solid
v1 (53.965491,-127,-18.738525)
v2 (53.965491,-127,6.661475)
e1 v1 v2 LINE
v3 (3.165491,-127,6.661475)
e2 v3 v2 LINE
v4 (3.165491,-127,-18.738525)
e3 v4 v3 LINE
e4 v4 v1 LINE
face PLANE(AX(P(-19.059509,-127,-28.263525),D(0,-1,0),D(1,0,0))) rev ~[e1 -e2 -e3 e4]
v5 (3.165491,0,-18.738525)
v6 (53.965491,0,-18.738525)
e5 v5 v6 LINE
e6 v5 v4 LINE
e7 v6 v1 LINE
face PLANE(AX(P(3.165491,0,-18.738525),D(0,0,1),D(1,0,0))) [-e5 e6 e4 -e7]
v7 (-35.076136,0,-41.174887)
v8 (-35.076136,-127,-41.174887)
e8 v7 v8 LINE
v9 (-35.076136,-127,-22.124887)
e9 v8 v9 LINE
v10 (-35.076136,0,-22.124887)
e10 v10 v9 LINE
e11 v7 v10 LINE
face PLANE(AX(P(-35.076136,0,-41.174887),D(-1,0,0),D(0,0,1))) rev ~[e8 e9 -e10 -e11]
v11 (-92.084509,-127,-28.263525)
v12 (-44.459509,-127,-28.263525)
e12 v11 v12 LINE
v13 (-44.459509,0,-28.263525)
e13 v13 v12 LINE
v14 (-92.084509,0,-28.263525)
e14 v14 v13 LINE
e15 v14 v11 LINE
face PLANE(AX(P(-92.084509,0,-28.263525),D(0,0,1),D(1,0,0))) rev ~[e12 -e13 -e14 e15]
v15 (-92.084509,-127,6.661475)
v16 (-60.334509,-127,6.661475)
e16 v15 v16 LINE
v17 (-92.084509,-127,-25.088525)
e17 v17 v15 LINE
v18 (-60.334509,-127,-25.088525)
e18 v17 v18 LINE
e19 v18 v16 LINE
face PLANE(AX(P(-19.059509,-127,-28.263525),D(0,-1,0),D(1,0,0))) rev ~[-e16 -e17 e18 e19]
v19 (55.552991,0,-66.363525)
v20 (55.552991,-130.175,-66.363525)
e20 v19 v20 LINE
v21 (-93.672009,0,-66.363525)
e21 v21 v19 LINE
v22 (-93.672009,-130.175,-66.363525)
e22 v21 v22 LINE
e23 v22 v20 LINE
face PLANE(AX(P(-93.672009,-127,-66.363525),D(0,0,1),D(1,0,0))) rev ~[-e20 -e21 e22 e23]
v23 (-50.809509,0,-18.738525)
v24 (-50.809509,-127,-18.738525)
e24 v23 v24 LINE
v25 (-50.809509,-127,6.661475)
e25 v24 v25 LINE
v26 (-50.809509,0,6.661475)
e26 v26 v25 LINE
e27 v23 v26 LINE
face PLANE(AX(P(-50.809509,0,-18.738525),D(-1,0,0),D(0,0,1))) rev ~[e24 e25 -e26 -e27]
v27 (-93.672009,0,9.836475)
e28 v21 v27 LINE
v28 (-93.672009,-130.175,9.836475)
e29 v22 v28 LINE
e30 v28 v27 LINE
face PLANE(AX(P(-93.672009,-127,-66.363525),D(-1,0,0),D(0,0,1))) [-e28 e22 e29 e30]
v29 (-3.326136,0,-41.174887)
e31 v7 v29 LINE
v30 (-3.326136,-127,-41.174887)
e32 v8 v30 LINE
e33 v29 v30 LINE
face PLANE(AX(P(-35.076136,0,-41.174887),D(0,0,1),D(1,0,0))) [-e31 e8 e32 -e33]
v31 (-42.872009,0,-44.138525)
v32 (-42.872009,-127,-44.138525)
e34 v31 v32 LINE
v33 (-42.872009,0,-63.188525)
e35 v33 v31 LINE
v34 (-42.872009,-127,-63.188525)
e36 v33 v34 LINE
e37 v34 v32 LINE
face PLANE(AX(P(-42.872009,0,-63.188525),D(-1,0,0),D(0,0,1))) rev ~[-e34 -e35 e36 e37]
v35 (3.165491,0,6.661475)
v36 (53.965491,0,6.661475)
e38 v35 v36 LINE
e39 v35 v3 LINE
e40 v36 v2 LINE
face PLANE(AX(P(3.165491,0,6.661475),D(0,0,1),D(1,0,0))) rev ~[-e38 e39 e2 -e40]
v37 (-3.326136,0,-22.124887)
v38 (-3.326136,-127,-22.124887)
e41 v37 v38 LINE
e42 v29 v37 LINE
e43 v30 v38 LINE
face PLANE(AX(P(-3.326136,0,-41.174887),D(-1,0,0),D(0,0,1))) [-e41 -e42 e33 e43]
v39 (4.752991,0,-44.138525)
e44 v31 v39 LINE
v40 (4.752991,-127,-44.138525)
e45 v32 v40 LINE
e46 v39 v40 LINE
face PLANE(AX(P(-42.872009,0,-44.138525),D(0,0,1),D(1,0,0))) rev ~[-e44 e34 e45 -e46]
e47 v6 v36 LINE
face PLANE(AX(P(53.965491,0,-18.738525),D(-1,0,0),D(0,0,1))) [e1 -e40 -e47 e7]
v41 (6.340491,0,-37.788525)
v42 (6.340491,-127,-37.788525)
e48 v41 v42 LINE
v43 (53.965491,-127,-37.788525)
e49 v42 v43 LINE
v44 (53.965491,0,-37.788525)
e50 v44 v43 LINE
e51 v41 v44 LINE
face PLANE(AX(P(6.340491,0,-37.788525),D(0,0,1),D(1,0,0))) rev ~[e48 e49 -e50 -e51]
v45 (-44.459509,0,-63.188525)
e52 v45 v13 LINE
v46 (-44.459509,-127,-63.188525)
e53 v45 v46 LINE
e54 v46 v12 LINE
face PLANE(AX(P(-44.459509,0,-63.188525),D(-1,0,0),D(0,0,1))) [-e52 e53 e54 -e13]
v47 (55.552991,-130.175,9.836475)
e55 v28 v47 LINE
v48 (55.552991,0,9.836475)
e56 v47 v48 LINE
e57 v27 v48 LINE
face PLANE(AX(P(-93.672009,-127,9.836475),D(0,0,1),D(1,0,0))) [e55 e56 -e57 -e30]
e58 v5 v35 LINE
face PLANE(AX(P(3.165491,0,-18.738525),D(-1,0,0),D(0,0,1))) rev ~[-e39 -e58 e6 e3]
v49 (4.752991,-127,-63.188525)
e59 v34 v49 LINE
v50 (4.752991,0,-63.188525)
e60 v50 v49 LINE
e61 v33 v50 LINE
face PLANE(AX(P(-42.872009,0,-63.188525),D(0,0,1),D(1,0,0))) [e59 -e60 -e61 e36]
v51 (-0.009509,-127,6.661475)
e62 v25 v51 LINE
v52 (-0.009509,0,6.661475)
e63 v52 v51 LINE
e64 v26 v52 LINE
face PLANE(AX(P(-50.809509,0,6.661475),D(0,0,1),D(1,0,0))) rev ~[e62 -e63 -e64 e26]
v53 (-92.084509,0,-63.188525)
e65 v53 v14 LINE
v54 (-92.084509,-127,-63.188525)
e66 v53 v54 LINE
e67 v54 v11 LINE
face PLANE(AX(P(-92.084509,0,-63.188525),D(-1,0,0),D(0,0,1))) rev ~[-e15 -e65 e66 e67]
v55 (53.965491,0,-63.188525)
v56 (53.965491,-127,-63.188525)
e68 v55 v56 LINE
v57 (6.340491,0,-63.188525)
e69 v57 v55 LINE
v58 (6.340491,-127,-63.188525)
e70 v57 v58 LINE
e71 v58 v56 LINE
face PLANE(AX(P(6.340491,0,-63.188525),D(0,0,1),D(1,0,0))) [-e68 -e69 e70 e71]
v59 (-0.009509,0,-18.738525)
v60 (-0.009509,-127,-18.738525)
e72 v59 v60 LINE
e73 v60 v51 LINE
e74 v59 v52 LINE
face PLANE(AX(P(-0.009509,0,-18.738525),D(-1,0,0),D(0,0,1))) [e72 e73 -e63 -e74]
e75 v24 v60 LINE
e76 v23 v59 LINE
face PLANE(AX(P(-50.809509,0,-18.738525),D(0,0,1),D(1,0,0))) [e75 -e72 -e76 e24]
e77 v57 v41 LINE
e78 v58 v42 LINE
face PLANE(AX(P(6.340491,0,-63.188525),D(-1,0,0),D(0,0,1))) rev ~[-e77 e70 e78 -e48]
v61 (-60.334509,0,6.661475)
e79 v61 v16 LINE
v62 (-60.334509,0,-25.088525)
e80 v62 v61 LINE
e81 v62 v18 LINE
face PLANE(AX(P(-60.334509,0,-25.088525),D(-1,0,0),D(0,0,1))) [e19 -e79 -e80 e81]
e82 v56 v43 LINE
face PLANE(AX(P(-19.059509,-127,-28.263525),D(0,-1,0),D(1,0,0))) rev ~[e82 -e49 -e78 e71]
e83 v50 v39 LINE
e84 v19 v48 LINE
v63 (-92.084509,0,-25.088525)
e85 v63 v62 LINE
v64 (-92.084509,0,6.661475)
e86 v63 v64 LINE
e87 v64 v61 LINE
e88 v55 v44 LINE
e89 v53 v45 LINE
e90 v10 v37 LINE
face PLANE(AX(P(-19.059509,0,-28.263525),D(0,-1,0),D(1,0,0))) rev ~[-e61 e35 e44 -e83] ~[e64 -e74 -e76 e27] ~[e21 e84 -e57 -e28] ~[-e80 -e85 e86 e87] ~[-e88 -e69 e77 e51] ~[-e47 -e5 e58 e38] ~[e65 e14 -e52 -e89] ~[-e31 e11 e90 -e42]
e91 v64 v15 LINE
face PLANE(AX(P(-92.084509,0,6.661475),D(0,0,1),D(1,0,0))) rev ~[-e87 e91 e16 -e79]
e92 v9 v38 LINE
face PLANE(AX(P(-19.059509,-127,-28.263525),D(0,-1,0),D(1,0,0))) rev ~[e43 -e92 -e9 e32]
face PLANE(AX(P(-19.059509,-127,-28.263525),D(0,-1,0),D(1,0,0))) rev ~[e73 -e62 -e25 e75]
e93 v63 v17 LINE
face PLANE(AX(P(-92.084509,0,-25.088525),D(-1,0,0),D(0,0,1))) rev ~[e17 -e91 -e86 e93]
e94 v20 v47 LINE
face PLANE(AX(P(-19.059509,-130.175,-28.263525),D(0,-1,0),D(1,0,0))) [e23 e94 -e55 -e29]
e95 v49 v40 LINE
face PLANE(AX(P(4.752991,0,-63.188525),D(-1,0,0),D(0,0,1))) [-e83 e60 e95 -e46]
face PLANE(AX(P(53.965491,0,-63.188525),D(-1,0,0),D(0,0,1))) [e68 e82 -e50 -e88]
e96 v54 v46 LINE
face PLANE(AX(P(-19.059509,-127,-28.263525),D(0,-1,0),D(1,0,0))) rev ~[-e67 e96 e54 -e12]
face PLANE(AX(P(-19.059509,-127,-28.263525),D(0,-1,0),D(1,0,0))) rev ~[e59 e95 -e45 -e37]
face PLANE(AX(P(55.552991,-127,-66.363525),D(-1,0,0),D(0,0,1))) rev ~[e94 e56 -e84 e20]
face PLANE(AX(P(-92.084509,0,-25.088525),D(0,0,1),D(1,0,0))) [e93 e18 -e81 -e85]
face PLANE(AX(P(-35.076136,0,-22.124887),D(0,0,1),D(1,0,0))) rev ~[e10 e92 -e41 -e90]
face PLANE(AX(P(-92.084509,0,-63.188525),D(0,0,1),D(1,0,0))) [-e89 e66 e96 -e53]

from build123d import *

# Parameters (mm, degrees)
F0_W     = 149.225
F0_H     = 76.2
F0_W_2   = 47.625
F0_H_2   = 34.925
F0_W_3   = 31.75
F0_H_3   = 19.05
F0_H_4   = 25.4
F0_H_5   = 31.75
F0_W_4   = 50.8
F1_DEPTH = 127
F2_W     = 149.225
F2_H     = 76.2
F3_DEPTH = 3.175


# Not quite as in the source:
# - a length typed as a fraction of an inch, garbled in the dataset ("3 / 203.2 mm" for 3/8 in), is restored


with BuildPart() as f1:
    # F0 (on Front) → F1 (new body)
    with BuildSketch(Plane.XZ):
        with Locations((-19.0595093454, -28.2635252237)):
            Rectangle(F0_W, F0_H)
        with Locations((-68.2720093454, -45.7260252237)):
            Rectangle(F0_W_2, F0_H_2, mode=Mode.SUBTRACT)
        with Locations((-19.2011359204, -31.6498865128)):
            Rectangle(F0_W_3, F0_H_3, mode=Mode.SUBTRACT)
        with Locations((-19.0595093454, -53.6635252237)):
            Rectangle(F0_W_2, F0_H_3, mode=Mode.SUBTRACT)
        with Locations((30.1529906546, -50.4885252237)):
            Rectangle(F0_W_2, F0_H_4, mode=Mode.SUBTRACT)
        with Locations((-76.2095093454, -9.2135252237)):
            Rectangle(F0_W_3, F0_H_5, mode=Mode.SUBTRACT)
        with Locations((-25.4095093454, -6.0385252237)):
            Rectangle(F0_W_4, F0_H_4, mode=Mode.SUBTRACT)
        with Locations((28.5654906546, -6.0385252237)):
            Rectangle(F0_W_4, F0_H_4, mode=Mode.SUBTRACT)
    extrude(amount=F1_DEPTH)

    # F2 (on face) → F3 (join)
    with BuildSketch(Plane.XZ.offset(127)):
        with Locations((-19.0595093454, -28.2635252237)):
            Rectangle(F2_W, F2_H)
    extrude(amount=F3_DEPTH)


solid = f1.part
